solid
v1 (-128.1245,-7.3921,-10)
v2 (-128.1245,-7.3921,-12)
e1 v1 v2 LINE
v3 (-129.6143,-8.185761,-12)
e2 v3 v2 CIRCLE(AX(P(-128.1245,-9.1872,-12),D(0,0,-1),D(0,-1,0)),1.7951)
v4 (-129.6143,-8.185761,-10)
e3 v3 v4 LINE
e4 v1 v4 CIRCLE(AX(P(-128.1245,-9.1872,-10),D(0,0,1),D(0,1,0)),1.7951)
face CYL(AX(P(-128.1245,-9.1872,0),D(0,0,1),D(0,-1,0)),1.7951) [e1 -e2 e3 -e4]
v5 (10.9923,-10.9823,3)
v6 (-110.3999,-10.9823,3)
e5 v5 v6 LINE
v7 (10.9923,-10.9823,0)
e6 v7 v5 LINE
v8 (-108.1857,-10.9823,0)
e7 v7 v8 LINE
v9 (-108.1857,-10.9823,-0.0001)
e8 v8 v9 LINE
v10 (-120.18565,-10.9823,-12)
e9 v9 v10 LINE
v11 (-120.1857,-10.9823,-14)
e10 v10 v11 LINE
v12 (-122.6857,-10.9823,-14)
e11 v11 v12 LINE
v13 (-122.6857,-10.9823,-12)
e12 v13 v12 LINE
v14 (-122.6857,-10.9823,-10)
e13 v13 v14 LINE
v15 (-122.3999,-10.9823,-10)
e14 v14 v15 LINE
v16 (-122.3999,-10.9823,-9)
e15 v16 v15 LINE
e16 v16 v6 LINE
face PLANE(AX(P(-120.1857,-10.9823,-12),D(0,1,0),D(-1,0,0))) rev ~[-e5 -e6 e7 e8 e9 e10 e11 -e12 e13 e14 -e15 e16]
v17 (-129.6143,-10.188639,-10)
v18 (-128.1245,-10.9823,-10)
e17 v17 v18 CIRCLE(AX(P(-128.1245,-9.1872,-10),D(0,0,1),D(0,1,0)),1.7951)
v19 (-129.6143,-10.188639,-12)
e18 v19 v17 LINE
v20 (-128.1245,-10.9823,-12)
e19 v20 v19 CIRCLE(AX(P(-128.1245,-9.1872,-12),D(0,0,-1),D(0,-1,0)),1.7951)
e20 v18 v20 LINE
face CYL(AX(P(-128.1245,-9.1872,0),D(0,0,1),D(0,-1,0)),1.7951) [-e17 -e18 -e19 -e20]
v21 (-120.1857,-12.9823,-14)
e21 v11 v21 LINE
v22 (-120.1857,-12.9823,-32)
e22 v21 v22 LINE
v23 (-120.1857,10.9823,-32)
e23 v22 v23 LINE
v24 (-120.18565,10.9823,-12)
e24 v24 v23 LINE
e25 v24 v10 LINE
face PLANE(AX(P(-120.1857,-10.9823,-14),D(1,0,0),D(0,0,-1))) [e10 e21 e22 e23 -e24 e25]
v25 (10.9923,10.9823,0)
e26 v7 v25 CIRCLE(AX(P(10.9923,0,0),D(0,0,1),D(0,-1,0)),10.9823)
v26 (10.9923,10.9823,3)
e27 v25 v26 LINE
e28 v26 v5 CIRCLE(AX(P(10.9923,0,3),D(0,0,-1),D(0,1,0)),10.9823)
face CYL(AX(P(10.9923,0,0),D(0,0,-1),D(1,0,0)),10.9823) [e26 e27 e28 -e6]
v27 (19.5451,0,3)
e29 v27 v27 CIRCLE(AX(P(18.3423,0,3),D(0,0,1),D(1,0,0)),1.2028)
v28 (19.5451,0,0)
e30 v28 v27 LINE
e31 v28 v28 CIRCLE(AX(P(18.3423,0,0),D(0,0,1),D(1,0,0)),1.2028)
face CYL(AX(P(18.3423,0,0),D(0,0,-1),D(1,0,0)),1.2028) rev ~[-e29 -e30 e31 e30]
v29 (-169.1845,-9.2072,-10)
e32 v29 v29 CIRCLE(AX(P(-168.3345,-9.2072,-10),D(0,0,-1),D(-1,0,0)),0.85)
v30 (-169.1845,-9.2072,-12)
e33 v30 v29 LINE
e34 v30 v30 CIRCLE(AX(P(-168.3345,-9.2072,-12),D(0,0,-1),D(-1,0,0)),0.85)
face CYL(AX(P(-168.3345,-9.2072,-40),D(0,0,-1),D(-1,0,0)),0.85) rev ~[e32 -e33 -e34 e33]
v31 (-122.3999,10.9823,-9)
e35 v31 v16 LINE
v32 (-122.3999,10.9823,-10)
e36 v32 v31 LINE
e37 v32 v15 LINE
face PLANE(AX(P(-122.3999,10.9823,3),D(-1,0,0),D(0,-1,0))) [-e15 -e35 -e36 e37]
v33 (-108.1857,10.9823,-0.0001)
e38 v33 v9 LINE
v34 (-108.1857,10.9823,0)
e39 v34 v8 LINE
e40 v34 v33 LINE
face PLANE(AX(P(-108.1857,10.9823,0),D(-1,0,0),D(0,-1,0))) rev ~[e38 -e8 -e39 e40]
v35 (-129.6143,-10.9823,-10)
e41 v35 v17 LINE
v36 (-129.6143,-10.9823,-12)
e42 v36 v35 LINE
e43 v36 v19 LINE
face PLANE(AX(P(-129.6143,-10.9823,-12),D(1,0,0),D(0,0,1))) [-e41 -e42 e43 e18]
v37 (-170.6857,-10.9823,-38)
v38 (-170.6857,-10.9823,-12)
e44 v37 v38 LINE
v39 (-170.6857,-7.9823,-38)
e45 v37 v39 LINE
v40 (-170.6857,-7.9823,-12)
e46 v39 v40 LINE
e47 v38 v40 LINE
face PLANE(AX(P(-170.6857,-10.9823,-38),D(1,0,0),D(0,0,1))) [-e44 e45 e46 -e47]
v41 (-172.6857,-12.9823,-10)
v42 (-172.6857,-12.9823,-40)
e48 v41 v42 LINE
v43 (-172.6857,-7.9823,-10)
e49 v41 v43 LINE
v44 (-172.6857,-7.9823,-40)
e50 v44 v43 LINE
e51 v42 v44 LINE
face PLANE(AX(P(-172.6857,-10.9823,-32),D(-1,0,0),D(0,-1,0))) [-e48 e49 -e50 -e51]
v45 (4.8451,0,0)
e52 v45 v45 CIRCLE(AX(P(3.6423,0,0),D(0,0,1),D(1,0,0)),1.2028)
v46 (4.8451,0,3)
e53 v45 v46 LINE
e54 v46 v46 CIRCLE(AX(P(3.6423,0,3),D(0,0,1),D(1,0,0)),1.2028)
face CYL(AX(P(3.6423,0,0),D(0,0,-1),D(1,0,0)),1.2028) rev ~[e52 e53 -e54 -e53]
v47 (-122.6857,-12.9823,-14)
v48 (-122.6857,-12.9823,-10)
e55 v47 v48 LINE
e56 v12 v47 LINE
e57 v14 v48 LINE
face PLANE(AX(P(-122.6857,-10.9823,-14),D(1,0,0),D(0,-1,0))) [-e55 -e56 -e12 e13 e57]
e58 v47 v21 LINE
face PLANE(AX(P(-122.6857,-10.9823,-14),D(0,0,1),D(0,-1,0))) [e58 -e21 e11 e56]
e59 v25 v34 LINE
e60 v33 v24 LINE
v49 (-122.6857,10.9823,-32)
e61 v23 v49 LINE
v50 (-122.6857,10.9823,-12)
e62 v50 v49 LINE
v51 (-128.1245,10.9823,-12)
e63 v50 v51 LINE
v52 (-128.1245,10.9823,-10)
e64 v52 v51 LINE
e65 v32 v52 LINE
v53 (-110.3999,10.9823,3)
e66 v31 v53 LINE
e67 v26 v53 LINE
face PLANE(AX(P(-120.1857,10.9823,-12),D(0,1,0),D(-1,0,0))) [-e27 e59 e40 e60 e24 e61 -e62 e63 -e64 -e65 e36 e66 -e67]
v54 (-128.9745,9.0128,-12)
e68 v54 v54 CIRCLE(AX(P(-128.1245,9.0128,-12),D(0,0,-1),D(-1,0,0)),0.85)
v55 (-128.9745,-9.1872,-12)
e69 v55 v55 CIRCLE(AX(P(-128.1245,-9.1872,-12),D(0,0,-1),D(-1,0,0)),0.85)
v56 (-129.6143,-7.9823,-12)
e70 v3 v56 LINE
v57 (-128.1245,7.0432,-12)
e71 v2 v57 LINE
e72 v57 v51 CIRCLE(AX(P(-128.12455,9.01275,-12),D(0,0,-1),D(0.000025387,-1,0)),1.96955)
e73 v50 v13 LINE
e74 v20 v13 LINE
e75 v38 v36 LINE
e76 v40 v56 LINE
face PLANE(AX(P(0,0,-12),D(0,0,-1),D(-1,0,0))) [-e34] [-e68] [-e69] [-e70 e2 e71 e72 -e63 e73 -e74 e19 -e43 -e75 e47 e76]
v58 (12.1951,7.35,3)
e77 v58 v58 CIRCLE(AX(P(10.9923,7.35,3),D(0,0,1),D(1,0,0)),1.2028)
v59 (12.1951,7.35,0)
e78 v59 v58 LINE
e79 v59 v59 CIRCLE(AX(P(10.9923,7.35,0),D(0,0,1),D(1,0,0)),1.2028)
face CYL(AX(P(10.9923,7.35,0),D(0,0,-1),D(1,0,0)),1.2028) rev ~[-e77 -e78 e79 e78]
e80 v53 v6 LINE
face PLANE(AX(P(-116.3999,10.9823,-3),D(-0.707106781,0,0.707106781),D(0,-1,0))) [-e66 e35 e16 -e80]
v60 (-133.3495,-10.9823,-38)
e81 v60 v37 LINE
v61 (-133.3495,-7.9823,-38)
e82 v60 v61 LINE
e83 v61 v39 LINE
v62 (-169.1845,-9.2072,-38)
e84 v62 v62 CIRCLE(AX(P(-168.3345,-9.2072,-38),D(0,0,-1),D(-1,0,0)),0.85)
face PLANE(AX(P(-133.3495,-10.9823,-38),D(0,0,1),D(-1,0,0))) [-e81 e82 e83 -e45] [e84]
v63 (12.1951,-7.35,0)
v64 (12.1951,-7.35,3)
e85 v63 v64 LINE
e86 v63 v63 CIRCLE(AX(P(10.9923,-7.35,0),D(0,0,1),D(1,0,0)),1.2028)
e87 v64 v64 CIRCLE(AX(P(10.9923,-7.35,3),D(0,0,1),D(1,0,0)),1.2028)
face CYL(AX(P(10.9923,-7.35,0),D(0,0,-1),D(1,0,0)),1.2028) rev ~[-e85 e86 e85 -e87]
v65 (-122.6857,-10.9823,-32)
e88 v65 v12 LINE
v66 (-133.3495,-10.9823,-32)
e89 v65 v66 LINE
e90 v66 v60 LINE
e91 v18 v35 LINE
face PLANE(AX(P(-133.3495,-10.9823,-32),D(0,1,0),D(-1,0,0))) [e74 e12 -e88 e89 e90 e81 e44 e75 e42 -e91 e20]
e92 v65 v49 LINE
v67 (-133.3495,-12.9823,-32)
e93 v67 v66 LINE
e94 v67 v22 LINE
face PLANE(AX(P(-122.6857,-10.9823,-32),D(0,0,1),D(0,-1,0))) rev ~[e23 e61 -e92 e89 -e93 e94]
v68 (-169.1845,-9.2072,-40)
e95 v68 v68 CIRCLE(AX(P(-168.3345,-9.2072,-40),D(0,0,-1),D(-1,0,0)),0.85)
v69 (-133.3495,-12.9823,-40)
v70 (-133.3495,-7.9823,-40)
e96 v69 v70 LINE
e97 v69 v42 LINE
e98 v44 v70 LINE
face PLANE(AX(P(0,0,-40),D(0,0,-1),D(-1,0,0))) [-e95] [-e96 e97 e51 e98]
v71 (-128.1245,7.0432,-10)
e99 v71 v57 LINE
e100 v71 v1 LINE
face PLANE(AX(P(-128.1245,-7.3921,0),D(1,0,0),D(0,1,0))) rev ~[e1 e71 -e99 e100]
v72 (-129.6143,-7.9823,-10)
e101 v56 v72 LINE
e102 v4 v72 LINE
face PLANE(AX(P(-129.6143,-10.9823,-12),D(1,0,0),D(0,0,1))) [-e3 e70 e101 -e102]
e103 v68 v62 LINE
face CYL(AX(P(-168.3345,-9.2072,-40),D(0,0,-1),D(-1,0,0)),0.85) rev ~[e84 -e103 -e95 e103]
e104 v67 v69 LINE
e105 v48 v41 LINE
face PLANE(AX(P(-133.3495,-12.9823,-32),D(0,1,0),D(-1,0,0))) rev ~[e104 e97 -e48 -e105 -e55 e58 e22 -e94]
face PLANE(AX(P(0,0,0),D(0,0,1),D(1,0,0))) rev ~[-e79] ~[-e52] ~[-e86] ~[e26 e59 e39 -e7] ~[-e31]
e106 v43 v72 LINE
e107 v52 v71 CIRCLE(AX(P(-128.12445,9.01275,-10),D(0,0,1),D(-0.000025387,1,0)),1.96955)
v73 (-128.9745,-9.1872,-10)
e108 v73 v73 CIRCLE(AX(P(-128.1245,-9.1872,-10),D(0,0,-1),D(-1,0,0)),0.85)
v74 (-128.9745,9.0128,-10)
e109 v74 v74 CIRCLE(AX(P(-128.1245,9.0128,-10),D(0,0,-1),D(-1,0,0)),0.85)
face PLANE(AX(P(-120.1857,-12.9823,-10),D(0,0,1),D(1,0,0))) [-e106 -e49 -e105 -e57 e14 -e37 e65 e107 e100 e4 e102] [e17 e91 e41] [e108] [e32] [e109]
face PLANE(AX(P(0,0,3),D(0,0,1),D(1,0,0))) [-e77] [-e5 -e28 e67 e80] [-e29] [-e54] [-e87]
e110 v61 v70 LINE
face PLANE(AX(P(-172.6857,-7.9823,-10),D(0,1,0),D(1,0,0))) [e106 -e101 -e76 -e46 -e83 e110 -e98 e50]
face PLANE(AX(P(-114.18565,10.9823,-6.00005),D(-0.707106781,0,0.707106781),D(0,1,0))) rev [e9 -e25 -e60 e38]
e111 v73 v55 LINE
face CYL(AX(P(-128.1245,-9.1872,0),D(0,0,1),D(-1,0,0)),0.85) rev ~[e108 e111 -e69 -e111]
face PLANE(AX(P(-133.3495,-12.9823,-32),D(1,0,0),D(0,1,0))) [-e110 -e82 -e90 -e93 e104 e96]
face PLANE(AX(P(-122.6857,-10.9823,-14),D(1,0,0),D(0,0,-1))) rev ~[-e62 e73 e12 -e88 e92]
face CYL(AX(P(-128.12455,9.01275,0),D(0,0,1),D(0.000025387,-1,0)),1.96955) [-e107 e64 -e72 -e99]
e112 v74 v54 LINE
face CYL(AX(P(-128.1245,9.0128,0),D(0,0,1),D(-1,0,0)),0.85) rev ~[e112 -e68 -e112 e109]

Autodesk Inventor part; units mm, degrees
ref_plane "YZ Plane" through (0, 0, 0) normal (1, 0, 0) x (0, 1, 0)
ref_plane "XZ Plane" through (0, 0, 0) normal (0, 1, 0) x (-1, 0, 0)
ref_plane "XY Plane" through (0, 0, 0) normal (0, 0, 1) x (1, 0, 0)
ref_plane "Plano de trabajo1" through (0, 0, 0) normal (0, 0, 1) x (1, 0, 0)
sketch "Boceto1" plane through (0, 0, 0) normal (0, 0, 1) x (1, 0, 0)
  circle A0 centre (10.9923, -7.35) radius 1.2028 projected
  circle A1 centre (3.6423, 0) radius 1.2028 projected
  circle A2 centre (18.3423, 0) radius 1.2028 projected
  circle A3 centre (10.9923, 7.35) radius 1.2028 projected
  circle A4 centre (10.9923, 0) radius 10.9823 projected
  line L0 (10.9923, -10.9823) -> (-139.0077, -10.9823)
  line L1 (10.9923, 10.9823) -> (-139.0077, 10.9823)
  line L2 (-139.0077, 10.9823) -> (-139.0077, -10.9823)
  point P0 (0, 0)
  dimension "d0" = 150
  dimension "d1" = 150
extrude "Extrusión1" add sketch "Boceto1" along normal blind 3
sketch "Boceto2" plane through (0, 0, 3) normal (0, 0, 1) x (1, 0, 0)
  arc A0 (-129.1978, -5.6745) -> (-132.1454, -8.5217) centre (-128.1245, -9.7351) ccw
  circle A1 centre (-128.1245, 8.4649) radius 0.85 construction
  circle A2 centre (-128.1245, -9.7351) radius 0.7049 construction
  line L0 (-139.0305, -11.0697) -> (-267.2186, 10.8953)
  line L1 (-267.2186, -11.0694) -> (-117.2186, -11.0694)
  line L2 (-139.0305, 10.8953) -> (-139.0305, -11.0694)
  line L3 (-117.2186, 10.8953) -> (-267.2186, 10.8953)
  line L4 (-128.1245, -11.0697) -> (-128.1245, -0.0872)
  line L5 (-128.1245, -0.0872) -> (-128.1245, 9.0128)
  line L6 (-128.1245, -0.0872) -> (-128.1245, -9.1872)
  circle A3 centre (-128.1245, -9.1872) radius 0.85
  circle A4 centre (-128.1245, 9.0128) radius 0.85
  circle A5 centre (-128.1245, -9.1872) radius 1.8825
  circle A6 centre (-128.1245, 9.0128) radius 1.8821
  circle A7 centre (-128.1245, 9.0128) radius 0.85
  circle A8 centre (-128.1245, -9.1872) radius 0.85
  line L7 (-128.1245, 10.8953) -> (-139.0305, 10.8953)
  line L8 (-139.0077, 10.9823) -> (-139.0077, -10.9823) projected
  line L9 (-139.0077, -10.9823) -> (-139.0077, 10.9823)
  line L10 (-139.0077, 10.9823) -> (-139.0077, -10.9823)
  point P0 (0, 0)
  dimension "d4" = 10.9825
  dimension "d5" = 9.1
  dimension "d6" = 9.1
  dimension "d7" = 1.7
  dimension "d8" = 1.7
extrude "Extrusión2" cut sketch "Boceto2" against normal blind 3 contours A3 L4 | L4 A3 | A4
sketch "Boceto3" plane through (0, 0, 3) normal (0, 0, 1) x (1, 0, 0)
  circle A0 centre (-128.1245, -9.1872) radius 0.85 projected
  circle A1 centre (-128.1245, 9.0128) radius 0.85 projected
  line L0 (10.9923, 10.9823) -> (-139.0077, 10.9823) projected
  line L1 (-139.0077, 10.9823) -> (-139.0077, -10.9823) projected
  line L2 (-139.0077, -10.9823) -> (10.9923, -10.9823) projected
  arc A2 (10.9923, -10.9823) -> (10.9923, 10.9823) centre (10.9923, 0) ccw projected
  circle A3 centre (10.9923, -7.35) radius 1.2028 projected
  circle A4 centre (3.6423, 0) radius 1.2028 projected
  circle A5 centre (18.3423, 0) radius 1.2028 projected
  circle A6 centre (10.9923, 7.35) radius 1.2028 projected
  line L3 (-130.1442, 5.5225) -> (-129.5361, 14.2169) projected
  circle A7 centre (-128.1245, -9.1872) radius 1.7951
  circle A8 centre (-128.1245, 9.0128) radius 1.9695
  line L4 (-128.1245, -7.3921) -> (-128.1245, 7.0432)
  line L5 (-128.1245, -10.9823) -> (-128.1245, -18.0451)
  line L6 (-128.1245, -18.0451) -> (-142.6221, -18.554)
  line L7 (-142.6221, -18.554) -> (-141.7315, 12.8288)
  line L8 (-141.7315, 12.8288) -> (-128.1245, 12.4426)
  line L9 (-128.1245, 12.4426) -> (-128.1245, 10.9823)
  point P0 (0, 0)
extrude "Extrusión3" cut sketch "Boceto3" against normal blind 3 contours A8 L3 L0 | L3 A8 L4 A7 L2 L1 L0
sketch "Boceto4" plane through (0, 0, 0) normal (0, 0, -1) x (-1, 0, 0)
  arc A0 (128.1245, 7.0432) -> (128.1245, 10.9823) centre (128.1245, 9.0128) ccw projected
  line L0 (-10.9923, 10.9823) -> (128.1245, 10.9823) projected
  arc A1 (-10.9923, 10.9823) -> (-10.9923, -10.9823) centre (-10.9923, 0) ccw projected
  line L1 (128.1245, -10.9823) -> (-10.9923, -10.9823) projected
  arc A2 (128.1245, -10.9823) -> (128.1245, -7.3921) centre (128.1245, -9.1872) ccw projected
  line L2 (128.1245, -7.3921) -> (128.1245, 7.0432) projected
  circle A3 centre (128.1245, -9.1872) radius 0.85 projected
  circle A4 centre (128.1245, 9.0128) radius 0.85 projected
  circle A5 centre (-10.9923, -7.35) radius 1.2028 projected
  circle A6 centre (-3.6423, 0) radius 1.2028 projected
  circle A7 centre (-18.3423, 0) radius 1.2028 projected
  circle A8 centre (-10.9923, 7.35) radius 1.2028 projected
  line L3 (108.1857, 10.9823) -> (108.1857, -10.9823)
  point P0 (0, 0)
extrude "Extrusión4" add sketch "Boceto4" along normal blind 12 contours L2 A2 L1 L3 L0 A0
sketch "Boceto5" plane through (0, 0, 3) normal (0, 0, 1) x (1, 0, 0)
  line L0 (-108.1857, -10.9823) -> (-108.1857, 10.9823) projected
  circle A0 centre (10.9923, 7.35) radius 1.2028 projected
  circle A1 centre (18.3423, 0) radius 1.2028 projected
  circle A2 centre (3.6423, 0) radius 1.2028 projected
  circle A3 centre (10.9923, -7.35) radius 1.2028 projected
  arc A4 (-128.1245, 10.9823) -> (-128.1245, 7.0432) centre (-128.1245, 9.0128) ccw projected
  line L1 (-128.1245, 7.0432) -> (-128.1245, -7.3921) projected
  arc A5 (-128.1245, -7.3921) -> (-128.1245, -10.9823) centre (-128.1245, -9.1872) ccw projected
  line L2 (-128.1245, -10.9823) -> (10.9923, -10.9823) projected
  arc A6 (10.9923, -10.9823) -> (10.9923, 10.9823) centre (10.9923, 0) ccw projected
  line L3 (10.9923, 10.9823) -> (-128.1245, 10.9823) projected
  circle A7 centre (-128.1245, 9.0128) radius 0.85 projected
  circle A8 centre (-128.1245, -9.1872) radius 0.85 projected
  line L4 (-108.1857, 10.9823) -> (-111.1857, 10.9823)
  line L5 (-111.1857, 10.9823) -> (-111.1857, -10.9823)
  line L6 (-111.1857, -10.9823) -> (-108.1857, -10.9823)
  line L7 (-108.1857, -10.9823) -> (-108.1857, 10.9823)
  line L8 (10.9923, 10.9823) -> (-128.1245, 10.9823) projected
  line L9 (-122.3999, 10.9823) -> (-122.3999, -10.9823)
  point P0 (0, 0)
  dimension "d15" = 3
extrude "Extrusión5" cut sketch "Boceto5" against normal blind 13 contours L2 A5 L1 A4 L3 L9
chamfer "Chaflán1" distance 12 angle 45 1 edges at (-122.3999, 0, 3)
chamfer "Chaflán2" distance 12 angle 45 1 edges at (-108.1857, 0, -12)
sketch "Boceto6" plane through (0, 0, -12) normal (0, 0, -1) x (-1, 0, 0)
  line L0 (126.0445, -11.1372) -> (126.0445, 10.9228)
  line L1 (120.1857, -10.9823) -> (120.1857, 10.9823) projected
  line L2 (120.1857, -10.9823) -> (128.1245, -10.9823) projected
  line L3 (120.1857, 10.9823) -> (122.6857, 10.9823)
  line L4 (122.6857, 10.9823) -> (122.6857, -10.9823)
  line L5 (122.6857, -10.9823) -> (120.1857, -10.9823)
  line L6 (120.1857, -10.9823) -> (120.1857, 10.9823)
  point P0 (0, 0)
  dimension "d24" = 2.5
extrude "Extrusión6" add sketch "Boceto6" along normal blind 20
sketch "Boceto7" plane through (-128.1245, -10.9823, -10) normal (0, -1, 0) x (1, 0, 0)
  line L0 (19.9388, 10) -> (7.9388, -2) projected
  line L1 (19.9388, 10) -> (139.1168, 10) projected
  line L2 (139.1168, 10) -> (139.1168, 13) projected
  line L3 (17.7246, 13) -> (139.1168, 13) projected
  line L4 (5.7246, 1) -> (17.7246, 13) projected
  line L5 (5.7246, 1) -> (5.7246, 0) projected
  line L6 (5.7246, 0) -> (0, 0) projected
  line L7 (0, 0) -> (0, -2) projected
  line L8 (5.4388, -2) -> (0, -2) projected
  line L9 (5.4388, -2) -> (5.4388, -22) projected
  line L10 (7.9388, -22) -> (5.4388, -22) projected
  line L11 (7.9388, -2) -> (7.9388, -22) projected
  line L12 (7.9388, -2) -> (7.9388, -22) projected
  line L13 (5.4388, -22) -> (7.9388, -22)
  line L14 (7.9388, -22) -> (7.9388, -4)
  line L15 (7.9388, -4) -> (5.4388, -4)
  line L16 (5.4388, -4) -> (5.4388, -22)
  point P0 (128.1245, 10)
  point P1 (5.4388, -4)
  dimension "d27" = 18
extrude "Extrusión7" add sketch "Boceto7" along normal blind 2 contours L11 L10 L9 L15
sketch "Boceto8" plane through (-122.6857, -10.9823, -12) normal (-1, 0, 0) x (0, 0, 1)
  line L0 (0, 21.9646) -> (0, 0) projected
  line L1 (0, 21.9646) -> (-20, 21.9646) projected
  line L2 (-20, 21.9646) -> (-20, -2) projected
  line L3 (-2, -2) -> (-20, -2) projected
  line L4 (-2, 0) -> (-2, -2) projected
  line L5 (0, 0) -> (-2, 0) projected
  line L6 (-20, 0) -> (-2, 0)
  point P0 (12, 10.9823)
extrude "Extrusión8" add sketch "Boceto8" along normal blind 50 contours L4 L3 L2 L6
sketch "Boceto9" plane through (-120.1857, -12.9823, -14) normal (0, 0, 1) x (1, 0, 0)
  line L0 (-2.5, 2) -> (0, 2) projected
  line L1 (-2.5, 2) -> (-52.5, 2) projected
  line L2 (-52.5, 0) -> (-52.5, 2) projected
  line L3 (0, 0) -> (-52.5, 0) projected
  line L4 (0, 2) -> (0, 0) projected
  line L5 (-2.5, 0) -> (-52.5, 0)
  line L6 (-52.5, 0) -> (-52.5, 2)
  line L7 (-52.5, 2) -> (-2.5, 2)
  line L8 (-2.5, 2) -> (-2.5, 0)
  point P0 (120.1857, 12.9823)
extrude "Extrusión9" add sketch "Boceto9" along normal blind 4 contours L8 L3 L2 L1
sketch "Boceto10" plane through (0, 0, -32) normal (0, 0, -1) x (-1, 0, 0)
  line L0 (120.1857, 10.9823) -> (120.1857, -12.9823) projected
  line L1 (120.1857, -12.9823) -> (172.6857, -12.9823) projected
  line L2 (172.6857, -10.9823) -> (172.6857, -12.9823) projected
  line L3 (122.6857, -10.9823) -> (172.6857, -10.9823) projected
  line L4 (122.6857, 10.9823) -> (122.6857, -10.9823) projected
  line L5 (122.6857, 10.9823) -> (120.1857, 10.9823) projected
  line L6 (133.3495, -12.9823) -> (133.3495, -10.9823)
  line L7 (128.1245, -10.9823) -> (172.6857, -10.9823) projected
  point P0 (0, 0)
extrude "Extrusión10" add sketch "Boceto10" along normal blind 8 contours L6 L3 L2 L1
sketch "Boceto11" plane through (-172.6857, -10.9823, -10) normal (0, 1, 0) x (1, 0, 0)
  line L0 (50, 22) -> (50, 4) projected
  line L1 (50, 22) -> (39.3362, 22) projected
  line L2 (39.3362, 22) -> (39.3362, 30) projected
  line L3 (0, 30) -> (39.3362, 30) projected
  line L4 (0, 30) -> (0, 0) projected
  line L5 (44.5612, 0) -> (0, 0) projected
  line L6 (44.5612, 0) -> (44.5612, 2) projected
  line L7 (50, 2) -> (44.5612, 2) projected
  line L8 (50, 2) -> (50, 4) projected
  line L9 (39.3362, 22) -> (39.3362, 30) projected
  line L10 (39.3362, 30) -> (39.3362, 28)
  line L11 (39.3362, 28) -> (0, 28)
  line L12 (0, 28) -> (2, 28)
  line L13 (2, 28) -> (2, 0)
  line L14 (0, 0) -> (0, 30) projected
  line L15 (0, 0) -> (0, 2)
  line L16 (0, 2) -> (43.0714, 2)
  line L17 (43.0714, 2) -> (43.0714, 0)
  line L18 (44.5612, 0) -> (0, 0) projected
  point P0 (172.6857, -10)
  point P1 (2, 2)
  point P2 (39.3362, 28)
  dimension "d36" = 2
  dimension "d37" = 2
  dimension "d38" = 2
extrude "Extrusión11" add sketch "Boceto11" along normal blind 3 contours L11 L4 L3 L2 | L13 L16 L4 L11 | L16 L17 L5 L13 | L13 L5 L4 L16
sketch "Boceto12" plane through (0, 0, -40) normal (0, 0, -1) x (-1, 0, 0)
  circle A0 centre (168.3345, -9.2072) radius 0.85
  point P0 (0, 0)
extrude "Extrusión12" cut sketch "Boceto12" against normal blind 35
properties part number "femurAux"
